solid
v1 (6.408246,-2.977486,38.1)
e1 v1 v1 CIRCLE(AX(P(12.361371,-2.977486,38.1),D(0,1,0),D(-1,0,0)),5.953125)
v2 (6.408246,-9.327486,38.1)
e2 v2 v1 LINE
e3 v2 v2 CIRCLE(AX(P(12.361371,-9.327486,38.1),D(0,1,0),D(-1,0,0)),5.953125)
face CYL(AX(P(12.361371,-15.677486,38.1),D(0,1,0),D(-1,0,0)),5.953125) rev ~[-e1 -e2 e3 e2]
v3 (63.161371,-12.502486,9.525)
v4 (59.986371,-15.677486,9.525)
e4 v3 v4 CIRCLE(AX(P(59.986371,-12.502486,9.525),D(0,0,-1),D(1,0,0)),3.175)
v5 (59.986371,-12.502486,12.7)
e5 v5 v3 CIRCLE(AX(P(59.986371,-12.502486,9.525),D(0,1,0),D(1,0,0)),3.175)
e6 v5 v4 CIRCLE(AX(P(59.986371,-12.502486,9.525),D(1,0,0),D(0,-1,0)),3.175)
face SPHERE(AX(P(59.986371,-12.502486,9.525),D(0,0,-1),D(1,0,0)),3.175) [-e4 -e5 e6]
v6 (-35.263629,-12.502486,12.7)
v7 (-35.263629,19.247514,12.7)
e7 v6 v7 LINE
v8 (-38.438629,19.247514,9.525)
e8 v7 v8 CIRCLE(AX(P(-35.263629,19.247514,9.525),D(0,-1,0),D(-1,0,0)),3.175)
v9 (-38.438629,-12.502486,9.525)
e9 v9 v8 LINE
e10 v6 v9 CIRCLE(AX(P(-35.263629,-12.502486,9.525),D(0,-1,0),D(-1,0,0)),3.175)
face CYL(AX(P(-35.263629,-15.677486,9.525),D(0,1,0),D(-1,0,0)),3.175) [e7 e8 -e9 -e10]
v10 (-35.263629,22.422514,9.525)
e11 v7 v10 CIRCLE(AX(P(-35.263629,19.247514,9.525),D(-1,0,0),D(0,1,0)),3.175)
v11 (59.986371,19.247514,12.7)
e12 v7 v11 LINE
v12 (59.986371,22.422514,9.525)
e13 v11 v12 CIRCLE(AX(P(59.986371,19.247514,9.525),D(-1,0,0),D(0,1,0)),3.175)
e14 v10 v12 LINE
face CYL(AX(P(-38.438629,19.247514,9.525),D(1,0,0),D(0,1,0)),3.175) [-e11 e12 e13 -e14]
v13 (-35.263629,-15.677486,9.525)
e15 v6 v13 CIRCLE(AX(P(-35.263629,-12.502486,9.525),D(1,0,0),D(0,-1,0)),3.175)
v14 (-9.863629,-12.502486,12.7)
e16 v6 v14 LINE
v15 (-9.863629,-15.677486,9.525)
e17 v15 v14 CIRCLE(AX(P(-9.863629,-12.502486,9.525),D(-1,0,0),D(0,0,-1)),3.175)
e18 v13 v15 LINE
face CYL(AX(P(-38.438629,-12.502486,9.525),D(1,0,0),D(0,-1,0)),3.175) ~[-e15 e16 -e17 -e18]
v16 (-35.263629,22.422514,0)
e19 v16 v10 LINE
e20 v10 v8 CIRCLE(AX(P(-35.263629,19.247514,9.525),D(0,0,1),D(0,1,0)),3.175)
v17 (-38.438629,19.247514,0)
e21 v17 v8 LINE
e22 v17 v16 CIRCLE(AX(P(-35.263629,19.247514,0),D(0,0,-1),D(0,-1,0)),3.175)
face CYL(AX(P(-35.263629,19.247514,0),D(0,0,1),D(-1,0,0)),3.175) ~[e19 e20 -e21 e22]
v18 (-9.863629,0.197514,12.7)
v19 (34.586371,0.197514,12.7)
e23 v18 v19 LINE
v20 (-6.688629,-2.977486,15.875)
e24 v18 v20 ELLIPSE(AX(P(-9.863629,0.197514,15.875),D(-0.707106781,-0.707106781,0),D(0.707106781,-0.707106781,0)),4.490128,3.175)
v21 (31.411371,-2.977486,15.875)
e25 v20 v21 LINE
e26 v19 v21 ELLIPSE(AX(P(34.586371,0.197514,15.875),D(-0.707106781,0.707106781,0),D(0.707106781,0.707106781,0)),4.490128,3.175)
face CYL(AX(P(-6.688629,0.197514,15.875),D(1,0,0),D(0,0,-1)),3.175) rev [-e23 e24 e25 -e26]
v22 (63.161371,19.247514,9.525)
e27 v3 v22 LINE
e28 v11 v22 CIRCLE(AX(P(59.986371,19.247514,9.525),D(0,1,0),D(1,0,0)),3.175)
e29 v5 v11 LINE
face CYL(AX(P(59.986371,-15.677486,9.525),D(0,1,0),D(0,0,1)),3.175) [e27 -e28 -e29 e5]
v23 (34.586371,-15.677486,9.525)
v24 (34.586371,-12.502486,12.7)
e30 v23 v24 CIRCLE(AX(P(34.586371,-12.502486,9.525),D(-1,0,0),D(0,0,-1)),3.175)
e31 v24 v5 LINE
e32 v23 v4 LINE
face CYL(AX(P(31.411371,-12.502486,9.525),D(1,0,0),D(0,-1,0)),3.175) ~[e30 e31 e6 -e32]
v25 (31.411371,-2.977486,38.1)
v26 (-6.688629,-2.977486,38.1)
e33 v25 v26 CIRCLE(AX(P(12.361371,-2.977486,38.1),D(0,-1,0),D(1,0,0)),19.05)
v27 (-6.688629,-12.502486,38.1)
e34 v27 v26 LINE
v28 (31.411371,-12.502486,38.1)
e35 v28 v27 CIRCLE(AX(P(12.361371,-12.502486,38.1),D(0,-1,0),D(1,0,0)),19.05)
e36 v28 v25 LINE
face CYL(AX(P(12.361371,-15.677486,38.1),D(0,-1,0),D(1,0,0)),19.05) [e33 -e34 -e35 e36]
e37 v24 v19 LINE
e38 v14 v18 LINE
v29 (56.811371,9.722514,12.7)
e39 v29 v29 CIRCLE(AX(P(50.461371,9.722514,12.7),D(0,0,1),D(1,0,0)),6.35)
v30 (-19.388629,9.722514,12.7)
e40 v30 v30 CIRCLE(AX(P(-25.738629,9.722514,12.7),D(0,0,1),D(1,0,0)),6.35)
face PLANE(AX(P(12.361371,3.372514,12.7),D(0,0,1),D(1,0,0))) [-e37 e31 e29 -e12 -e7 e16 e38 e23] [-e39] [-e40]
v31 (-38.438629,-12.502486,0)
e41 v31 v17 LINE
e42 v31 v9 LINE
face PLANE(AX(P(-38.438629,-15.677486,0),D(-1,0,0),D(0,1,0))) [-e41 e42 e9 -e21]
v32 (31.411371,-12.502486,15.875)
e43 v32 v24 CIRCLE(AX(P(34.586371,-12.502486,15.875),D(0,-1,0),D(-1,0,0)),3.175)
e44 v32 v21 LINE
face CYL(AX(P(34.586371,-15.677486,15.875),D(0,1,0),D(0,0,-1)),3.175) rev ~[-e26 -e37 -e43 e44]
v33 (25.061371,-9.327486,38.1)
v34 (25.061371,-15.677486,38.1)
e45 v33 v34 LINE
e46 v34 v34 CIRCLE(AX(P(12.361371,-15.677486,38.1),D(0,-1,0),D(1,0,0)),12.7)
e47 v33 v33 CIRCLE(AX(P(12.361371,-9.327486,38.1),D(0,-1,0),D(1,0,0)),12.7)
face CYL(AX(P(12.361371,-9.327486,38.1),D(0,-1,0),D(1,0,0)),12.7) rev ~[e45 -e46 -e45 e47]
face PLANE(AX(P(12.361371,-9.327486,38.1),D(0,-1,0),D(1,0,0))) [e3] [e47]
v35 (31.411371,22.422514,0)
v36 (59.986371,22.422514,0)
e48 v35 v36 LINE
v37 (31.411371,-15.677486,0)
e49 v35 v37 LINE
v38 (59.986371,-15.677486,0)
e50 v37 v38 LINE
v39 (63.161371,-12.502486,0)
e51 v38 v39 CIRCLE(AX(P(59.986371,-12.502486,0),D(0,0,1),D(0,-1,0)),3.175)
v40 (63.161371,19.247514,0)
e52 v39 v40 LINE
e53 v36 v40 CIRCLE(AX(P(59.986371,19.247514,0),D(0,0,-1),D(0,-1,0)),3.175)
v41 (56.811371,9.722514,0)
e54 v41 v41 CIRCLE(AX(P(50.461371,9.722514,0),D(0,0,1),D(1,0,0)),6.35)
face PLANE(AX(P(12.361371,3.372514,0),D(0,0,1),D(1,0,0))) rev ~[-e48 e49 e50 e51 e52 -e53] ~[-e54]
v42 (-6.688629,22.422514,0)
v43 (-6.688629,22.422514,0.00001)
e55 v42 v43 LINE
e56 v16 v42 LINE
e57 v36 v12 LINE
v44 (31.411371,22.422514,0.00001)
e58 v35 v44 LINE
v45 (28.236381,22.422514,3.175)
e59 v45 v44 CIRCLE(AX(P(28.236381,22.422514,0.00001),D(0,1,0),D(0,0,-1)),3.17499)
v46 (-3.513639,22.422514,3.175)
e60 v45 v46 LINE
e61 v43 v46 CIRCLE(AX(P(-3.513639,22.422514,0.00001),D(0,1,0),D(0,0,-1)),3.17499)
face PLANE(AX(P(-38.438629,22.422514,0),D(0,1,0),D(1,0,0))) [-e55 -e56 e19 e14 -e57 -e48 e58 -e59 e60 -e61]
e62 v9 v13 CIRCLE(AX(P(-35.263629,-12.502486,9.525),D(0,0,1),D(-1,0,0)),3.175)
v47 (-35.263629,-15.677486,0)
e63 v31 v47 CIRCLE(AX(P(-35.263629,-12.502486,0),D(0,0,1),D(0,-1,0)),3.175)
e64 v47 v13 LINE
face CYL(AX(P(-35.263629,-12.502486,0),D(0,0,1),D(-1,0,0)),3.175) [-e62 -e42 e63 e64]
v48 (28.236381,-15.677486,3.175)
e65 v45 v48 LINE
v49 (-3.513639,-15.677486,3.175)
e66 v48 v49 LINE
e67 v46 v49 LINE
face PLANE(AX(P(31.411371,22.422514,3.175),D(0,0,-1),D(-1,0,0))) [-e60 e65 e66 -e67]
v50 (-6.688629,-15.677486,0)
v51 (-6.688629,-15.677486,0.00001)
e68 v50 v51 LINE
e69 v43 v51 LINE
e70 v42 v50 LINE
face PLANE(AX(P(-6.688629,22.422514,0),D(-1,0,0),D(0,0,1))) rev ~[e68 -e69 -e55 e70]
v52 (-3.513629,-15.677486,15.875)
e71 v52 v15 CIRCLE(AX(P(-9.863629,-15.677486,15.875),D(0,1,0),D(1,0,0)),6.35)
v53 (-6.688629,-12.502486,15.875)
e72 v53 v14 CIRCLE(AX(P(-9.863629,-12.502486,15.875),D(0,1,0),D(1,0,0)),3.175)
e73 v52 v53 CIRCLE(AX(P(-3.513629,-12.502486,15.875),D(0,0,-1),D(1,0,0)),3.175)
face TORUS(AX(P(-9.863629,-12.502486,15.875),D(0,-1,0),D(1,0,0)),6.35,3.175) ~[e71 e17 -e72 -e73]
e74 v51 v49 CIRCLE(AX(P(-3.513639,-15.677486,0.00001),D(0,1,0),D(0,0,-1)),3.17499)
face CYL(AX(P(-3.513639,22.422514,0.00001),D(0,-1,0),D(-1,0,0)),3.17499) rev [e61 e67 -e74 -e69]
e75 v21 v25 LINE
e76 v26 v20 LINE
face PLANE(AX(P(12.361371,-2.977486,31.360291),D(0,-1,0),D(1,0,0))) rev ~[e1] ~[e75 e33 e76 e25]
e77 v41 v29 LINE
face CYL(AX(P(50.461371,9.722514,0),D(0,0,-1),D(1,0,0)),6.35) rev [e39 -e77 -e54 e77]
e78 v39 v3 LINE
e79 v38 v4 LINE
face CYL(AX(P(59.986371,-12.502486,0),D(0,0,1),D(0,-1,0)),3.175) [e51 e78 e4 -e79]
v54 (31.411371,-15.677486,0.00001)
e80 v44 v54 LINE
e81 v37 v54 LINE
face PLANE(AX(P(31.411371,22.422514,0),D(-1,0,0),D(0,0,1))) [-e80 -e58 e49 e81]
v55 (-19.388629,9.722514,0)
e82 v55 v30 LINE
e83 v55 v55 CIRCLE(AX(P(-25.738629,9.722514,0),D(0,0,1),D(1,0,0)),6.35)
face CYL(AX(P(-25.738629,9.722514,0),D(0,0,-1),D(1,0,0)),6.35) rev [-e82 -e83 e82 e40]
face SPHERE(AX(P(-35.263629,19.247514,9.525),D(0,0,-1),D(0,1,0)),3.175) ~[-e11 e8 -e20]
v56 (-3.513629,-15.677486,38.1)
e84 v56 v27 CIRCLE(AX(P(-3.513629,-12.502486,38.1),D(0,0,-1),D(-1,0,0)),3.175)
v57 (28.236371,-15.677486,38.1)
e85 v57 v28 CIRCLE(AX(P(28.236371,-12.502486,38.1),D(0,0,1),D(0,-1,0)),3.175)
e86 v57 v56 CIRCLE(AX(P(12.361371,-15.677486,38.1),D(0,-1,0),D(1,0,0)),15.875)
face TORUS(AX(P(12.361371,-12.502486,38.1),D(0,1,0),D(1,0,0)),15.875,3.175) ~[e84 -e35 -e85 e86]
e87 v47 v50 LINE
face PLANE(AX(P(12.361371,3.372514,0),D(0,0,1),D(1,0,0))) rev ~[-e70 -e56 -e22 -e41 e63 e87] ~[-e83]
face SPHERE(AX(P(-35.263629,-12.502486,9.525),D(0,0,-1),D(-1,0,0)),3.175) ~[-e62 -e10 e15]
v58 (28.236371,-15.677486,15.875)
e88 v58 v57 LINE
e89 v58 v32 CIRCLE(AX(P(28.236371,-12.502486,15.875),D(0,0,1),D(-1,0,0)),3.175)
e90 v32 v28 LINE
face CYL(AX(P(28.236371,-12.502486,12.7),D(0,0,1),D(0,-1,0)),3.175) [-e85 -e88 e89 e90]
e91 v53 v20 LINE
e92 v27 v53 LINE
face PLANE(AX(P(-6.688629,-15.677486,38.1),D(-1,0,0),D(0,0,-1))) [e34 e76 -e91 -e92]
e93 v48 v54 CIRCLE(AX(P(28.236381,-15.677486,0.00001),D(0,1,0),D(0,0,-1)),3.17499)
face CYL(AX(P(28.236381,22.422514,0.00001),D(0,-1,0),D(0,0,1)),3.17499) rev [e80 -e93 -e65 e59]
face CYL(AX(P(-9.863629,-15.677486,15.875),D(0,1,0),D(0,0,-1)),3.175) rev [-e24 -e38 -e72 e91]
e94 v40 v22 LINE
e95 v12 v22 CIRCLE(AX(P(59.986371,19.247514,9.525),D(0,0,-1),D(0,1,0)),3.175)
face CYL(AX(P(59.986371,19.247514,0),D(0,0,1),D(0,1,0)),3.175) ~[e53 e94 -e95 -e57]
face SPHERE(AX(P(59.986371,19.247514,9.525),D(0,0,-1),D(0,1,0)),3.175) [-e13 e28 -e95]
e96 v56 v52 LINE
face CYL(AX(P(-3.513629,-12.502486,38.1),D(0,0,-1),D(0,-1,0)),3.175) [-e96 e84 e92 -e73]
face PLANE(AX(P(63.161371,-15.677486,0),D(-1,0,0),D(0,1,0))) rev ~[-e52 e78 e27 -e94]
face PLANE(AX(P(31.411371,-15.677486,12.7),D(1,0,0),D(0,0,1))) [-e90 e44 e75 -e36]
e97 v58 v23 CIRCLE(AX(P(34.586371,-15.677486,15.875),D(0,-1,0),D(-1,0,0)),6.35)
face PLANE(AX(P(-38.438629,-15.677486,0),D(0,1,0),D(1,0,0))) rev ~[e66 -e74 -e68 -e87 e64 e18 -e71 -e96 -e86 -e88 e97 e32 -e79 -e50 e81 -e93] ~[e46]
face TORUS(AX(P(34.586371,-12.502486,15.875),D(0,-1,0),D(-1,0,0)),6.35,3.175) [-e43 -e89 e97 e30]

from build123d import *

# Parameters (mm, degrees)
F0_W           = 101.6
F0_H           = 38.1
F0_R           = 6.35
F1_DEPTH       = 12.7
F3_DEPTH       = 12.7
F4_D           = 11.90625
F4_CBORE_D     = 25.4
F4_CBORE_DEPTH = 6.35
F5_W           = 38.1
F5_H           = 3.175
F6_DEPTH       = 38.101
F9_R           = 3.175
F9_R_2         = 3.17499


# Not quite as in the source:
# - a fillet or chamfer is up to 0.001 mm smaller than in the source, because OpenCascade refuses the exact size
# - a feature of the source that left no trace in its solid (it failed there, or was rolled back) is left out
# - a length typed as a fraction of an inch, garbled in the dataset ("3 / 203.2 mm" for 3/8 in), is restored


with BuildPart() as f1:
    # F0 (on Top) → F1 (new body)
    with BuildSketch(Plane.XY):
        with Locations((12.3613710271, 3.3725141548)):
            Rectangle(F0_W, F0_H)
        with Locations((-25.7386289729, 9.7225141548)):
            Circle(F0_R, mode=Mode.SUBTRACT)
        with Locations((50.4613710271, 9.7225141548)):
            Circle(F0_R, mode=Mode.SUBTRACT)
    extrude(amount=F1_DEPTH)

    # F2 (on face) → F3 (join)
    with BuildSketch(Plane.XZ.offset(15.6774858452)):
        with BuildLine():
            Line((-6.6886289729, 38.1), (-6.6886289729, 12.7))
            Line((-6.6886289729, 12.7), (31.4113710271, 12.7))
            Line((31.4113710271, 12.7), (31.4113710271, 38.1))
            ThreePointArc((31.4113710271, 38.1), (12.3613710271, 57.15), (-6.6886289729, 38.1))
        make_face()
    extrude(amount=-F3_DEPTH)

    # F4 (through all)
    with Locations(Plane.XZ.offset(15.6774858452)):
        with Locations((12.3613710271, 38.1)):
            CounterBoreHole(F4_D / 2, F4_CBORE_D / 2, F4_CBORE_DEPTH)

    # F5 (on face) → F6 (cut, through all)
    with BuildSketch(Plane(origin=(0, 22.4225141548, 0), x_dir=(-1, 0, 0), z_dir=(0, 1, 0))):
        with Locations((-12.3613710271, 1.5875)):
            Rectangle(F5_W, F5_H)
    extrude(amount=-F6_DEPTH, mode=Mode.SUBTRACT)

    # F8: union 

    # F9 (call 1 of 3: OpenCascade refuses the feature's edges together)
    f9_edges = [f1.edges().sort_by_distance(p)[0] for p in [
        (63.161371, -15.677486, 6.35),
        (63.161371, 22.422514, 6.35),
        (-38.438629, -15.677486, 6.35),
        (-38.438629, 22.422514, 6.35),
        (12.361371, 22.422514, 12.7),
        (63.161371, 3.372514, 12.7),
        (-38.438629, 3.372514, 12.7),
        (47.286371, -15.677486, 12.7),
        (-22.563629, -15.677486, 12.7),
        (12.361371, -2.977486, 12.7),
        (31.411371, -9.327486, 12.7),
        (-6.688629, -9.327486, 12.7),
        (31.411371, -15.677486, 25.4),
        (12.361371, -15.677486, 57.15),
        (-6.688629, -15.677486, 25.4),
    ]]
    fillet(f9_edges, radius=F9_R)

    # F9#2 (call 2 of 3) (radius 3.175 in the source; OpenCascade refuses exactly that, so slightly less here)
    f9_2_edges = [f1.edges().sort_by_distance(p)[0] for p in [
        (-6.688629, 3.372514, 3.175),
    ]]
    fillet(f9_2_edges, radius=F9_R_2)

    # F9#3 (call 3 of 3) (radius 3.175 in the source; OpenCascade refuses exactly that, so slightly less here)
    f9_3_edges = [f1.edges().sort_by_distance(p)[0] for p in [
        (31.411371, 3.372514, 3.175),
    ]]
    fillet(f9_3_edges, radius=F9_R_2)


solid = f1.part
